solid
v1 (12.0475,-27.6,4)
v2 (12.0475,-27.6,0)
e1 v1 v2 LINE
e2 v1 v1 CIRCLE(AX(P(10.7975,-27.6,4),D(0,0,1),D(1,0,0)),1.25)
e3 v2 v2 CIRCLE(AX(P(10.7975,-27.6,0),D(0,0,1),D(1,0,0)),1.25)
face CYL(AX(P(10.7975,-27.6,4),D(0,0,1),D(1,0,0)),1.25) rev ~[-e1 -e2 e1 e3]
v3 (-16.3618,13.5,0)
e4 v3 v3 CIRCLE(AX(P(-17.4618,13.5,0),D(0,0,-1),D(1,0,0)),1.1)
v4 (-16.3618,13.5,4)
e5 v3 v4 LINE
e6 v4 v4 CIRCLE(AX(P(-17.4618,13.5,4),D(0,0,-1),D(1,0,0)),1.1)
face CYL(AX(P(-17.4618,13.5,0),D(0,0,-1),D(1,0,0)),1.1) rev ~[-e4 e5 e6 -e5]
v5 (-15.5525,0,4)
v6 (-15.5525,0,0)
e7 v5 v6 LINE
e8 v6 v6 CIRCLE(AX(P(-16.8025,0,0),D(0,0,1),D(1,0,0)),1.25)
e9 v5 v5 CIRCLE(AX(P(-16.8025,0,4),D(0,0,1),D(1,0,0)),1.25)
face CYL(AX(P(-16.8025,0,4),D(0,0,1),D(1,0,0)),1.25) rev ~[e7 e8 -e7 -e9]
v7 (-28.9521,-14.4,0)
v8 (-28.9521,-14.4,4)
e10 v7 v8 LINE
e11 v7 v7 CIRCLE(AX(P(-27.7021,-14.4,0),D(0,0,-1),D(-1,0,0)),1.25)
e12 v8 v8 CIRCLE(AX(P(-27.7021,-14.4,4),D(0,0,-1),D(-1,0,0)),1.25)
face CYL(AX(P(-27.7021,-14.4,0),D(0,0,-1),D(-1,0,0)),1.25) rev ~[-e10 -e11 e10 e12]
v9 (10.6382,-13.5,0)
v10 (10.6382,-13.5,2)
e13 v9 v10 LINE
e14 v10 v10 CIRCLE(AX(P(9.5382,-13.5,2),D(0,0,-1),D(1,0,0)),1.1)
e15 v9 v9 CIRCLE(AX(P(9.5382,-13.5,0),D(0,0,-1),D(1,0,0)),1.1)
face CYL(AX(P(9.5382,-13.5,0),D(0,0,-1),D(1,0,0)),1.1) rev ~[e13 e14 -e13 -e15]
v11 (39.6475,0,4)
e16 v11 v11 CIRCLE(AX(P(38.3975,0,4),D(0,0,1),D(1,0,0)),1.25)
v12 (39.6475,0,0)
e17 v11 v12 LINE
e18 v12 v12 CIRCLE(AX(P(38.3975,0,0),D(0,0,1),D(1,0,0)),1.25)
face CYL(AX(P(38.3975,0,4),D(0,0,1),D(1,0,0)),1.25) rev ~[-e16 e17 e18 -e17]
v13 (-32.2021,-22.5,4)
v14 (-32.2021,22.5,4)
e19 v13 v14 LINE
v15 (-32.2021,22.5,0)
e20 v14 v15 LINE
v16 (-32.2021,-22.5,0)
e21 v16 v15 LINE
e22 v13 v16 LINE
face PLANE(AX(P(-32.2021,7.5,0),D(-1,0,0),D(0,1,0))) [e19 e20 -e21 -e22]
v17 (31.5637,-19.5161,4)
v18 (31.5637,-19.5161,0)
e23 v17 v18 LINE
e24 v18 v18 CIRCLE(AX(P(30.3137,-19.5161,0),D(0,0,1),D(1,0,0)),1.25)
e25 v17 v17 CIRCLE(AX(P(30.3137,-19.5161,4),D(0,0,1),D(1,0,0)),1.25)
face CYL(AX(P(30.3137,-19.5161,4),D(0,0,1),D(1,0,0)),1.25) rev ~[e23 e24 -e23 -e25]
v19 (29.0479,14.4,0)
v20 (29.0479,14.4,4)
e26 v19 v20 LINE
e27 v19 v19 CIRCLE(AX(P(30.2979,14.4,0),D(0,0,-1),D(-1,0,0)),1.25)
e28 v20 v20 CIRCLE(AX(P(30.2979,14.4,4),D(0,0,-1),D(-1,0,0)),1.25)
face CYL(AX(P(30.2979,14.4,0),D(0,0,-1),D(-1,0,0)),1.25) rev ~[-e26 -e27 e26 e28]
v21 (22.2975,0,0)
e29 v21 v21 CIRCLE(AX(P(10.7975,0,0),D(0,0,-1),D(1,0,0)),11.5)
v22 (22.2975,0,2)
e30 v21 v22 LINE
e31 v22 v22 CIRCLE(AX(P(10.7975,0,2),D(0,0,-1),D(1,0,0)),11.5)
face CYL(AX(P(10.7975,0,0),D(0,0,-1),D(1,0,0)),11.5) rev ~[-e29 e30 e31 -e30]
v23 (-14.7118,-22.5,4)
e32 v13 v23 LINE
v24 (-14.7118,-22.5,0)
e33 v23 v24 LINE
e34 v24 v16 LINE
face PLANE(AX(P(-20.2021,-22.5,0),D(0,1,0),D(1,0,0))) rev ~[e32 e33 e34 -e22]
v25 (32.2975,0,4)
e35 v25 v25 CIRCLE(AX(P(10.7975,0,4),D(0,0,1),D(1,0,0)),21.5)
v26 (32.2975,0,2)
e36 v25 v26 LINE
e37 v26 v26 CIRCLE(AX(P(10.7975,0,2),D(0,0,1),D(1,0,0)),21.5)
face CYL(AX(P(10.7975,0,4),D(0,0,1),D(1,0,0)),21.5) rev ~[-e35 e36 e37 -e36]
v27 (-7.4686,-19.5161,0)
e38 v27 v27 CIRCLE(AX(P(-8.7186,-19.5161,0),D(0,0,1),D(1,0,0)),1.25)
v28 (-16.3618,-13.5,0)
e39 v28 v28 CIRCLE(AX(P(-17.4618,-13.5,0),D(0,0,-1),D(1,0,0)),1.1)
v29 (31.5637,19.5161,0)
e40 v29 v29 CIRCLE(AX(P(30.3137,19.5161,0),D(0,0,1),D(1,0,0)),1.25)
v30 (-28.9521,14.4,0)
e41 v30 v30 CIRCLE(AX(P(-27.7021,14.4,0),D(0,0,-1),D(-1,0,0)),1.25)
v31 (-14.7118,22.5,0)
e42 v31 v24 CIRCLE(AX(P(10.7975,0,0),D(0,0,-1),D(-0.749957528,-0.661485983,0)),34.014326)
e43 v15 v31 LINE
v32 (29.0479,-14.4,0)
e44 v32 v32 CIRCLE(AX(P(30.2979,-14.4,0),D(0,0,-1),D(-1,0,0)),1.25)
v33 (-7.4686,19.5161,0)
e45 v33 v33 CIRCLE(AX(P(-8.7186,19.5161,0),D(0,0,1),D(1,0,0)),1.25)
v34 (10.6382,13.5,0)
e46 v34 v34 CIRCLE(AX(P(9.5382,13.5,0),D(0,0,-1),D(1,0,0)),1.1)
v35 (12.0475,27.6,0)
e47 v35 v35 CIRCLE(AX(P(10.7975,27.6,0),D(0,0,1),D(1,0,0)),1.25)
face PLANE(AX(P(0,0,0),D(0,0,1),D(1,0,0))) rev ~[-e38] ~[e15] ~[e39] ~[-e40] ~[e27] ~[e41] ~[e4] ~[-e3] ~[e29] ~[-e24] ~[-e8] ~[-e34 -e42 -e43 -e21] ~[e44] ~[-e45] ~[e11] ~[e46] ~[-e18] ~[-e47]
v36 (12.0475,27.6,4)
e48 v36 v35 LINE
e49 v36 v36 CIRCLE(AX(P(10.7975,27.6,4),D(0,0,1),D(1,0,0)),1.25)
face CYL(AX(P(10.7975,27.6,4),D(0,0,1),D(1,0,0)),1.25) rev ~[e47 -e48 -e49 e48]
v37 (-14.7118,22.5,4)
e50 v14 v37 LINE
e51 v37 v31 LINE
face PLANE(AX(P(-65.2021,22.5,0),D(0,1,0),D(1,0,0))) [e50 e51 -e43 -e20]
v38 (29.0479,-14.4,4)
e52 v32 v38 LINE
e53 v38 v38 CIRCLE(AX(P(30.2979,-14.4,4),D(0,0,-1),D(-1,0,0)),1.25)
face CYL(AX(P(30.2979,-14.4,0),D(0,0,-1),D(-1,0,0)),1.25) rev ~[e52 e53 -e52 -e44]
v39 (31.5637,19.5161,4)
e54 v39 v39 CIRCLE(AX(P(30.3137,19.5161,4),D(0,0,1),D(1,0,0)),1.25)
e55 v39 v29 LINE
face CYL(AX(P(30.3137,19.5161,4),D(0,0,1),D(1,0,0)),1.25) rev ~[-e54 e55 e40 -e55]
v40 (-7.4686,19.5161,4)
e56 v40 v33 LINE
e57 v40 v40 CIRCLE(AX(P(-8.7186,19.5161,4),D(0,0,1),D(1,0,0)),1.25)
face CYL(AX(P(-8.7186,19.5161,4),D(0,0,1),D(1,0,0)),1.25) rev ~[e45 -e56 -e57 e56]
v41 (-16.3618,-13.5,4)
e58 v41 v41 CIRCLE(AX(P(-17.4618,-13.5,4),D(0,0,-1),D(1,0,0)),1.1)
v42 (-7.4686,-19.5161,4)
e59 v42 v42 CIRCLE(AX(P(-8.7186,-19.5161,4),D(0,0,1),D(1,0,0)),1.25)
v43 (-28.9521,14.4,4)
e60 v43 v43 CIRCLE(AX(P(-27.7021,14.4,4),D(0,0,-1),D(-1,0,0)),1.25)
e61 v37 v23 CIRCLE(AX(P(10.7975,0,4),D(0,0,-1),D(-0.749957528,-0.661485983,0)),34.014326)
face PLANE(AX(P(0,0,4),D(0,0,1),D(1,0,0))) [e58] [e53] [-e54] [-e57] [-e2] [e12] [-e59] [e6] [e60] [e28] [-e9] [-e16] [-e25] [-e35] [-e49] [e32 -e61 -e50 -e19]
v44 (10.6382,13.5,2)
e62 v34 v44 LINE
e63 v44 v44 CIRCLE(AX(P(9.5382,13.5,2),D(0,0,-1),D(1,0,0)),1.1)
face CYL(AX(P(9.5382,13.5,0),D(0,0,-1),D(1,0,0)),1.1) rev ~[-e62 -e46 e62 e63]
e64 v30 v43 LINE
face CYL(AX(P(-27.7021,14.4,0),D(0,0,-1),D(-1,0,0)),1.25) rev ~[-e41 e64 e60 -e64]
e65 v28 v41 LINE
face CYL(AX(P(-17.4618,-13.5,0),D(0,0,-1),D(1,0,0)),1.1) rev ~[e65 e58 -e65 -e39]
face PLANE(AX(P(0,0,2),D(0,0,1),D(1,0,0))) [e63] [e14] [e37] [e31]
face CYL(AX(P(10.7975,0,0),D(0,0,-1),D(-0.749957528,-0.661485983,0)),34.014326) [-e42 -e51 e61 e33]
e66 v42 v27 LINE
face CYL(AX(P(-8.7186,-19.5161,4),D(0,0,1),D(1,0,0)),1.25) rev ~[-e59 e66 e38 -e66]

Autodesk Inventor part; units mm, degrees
ref_plane "YZ Plane" through (0, 0, 0) normal (1, 0, 0) x (0, 1, 0)
ref_plane "XZ Plane" through (0, 0, 0) normal (0, 1, 0) x (-1, 0, 0)
ref_plane "XY Plane" through (0, 0, 0) normal (0, 0, 1) x (1, 0, 0)
sketch "スケッチ1" plane through (0, 0, 0) normal (0, 0, 1) x (1, 0, 0)
  line L0 (22.7979, -11.619) -> (22.7979, 11.619) construction
  arc A0 (22.7979, 11.619) -> (11.7979, 16) centre (11.7979, 0) ccw construction
  line L1 (11.7979, 16) -> (-18.2021, 16) construction
  arc A1 (-18.2021, 16) -> (-20.2021, 14) centre (-18.2021, 14) ccw construction
  line L2 (-20.2021, 14) -> (-20.2021, -14) construction
  arc A2 (-20.2021, -14) -> (-18.2021, -16) centre (-18.2021, -14) ccw construction
  line L3 (-18.2021, -16) -> (11.7979, -16) construction
  arc A3 (11.7979, -16) -> (22.7979, -11.619) centre (11.7979, 0) ccw construction
  circle A4 centre (-17.4618, -13.5) radius 1.05 construction
  circle A5 centre (-17.4618, 13.5) radius 1.05 construction
  circle A6 centre (9.5382, -13.5) radius 1.05 construction
  circle A7 centre (9.5382, 13.5) radius 1.05 construction
  circle A8 centre (10.7975, 0) radius 2.7 projected
  circle A9 centre (-57.7021, 15) radius 1.6 construction
  circle A10 centre (-27.7021, 15) radius 1.6 construction
  line L4 (-65.2021, 7.5) -> (-65.2021, 22.5) projected
  line L5 (-65.2021, 7.5) -> (-20.2021, 7.5) construction
  line L6 (-20.2021, 22.5) -> (-20.2021, 7.5) construction
  line L7 (-65.2021, 22.5) -> (-20.2021, 22.5) projected
  circle A11 centre (-57.7021, -15) radius 1.6 construction
  circle A12 centre (-27.7021, -15) radius 1.6 construction
  line L8 (-65.2021, -22.5) -> (-65.2021, -7.5) projected
  line L9 (-65.2021, -22.5) -> (-20.2021, -22.5) projected
  line L10 (-20.2021, -7.5) -> (-20.2021, -22.5) construction
  line L11 (-65.2021, -7.5) -> (-20.2021, -7.5) construction
  circle A13 centre (-57.7021, -15) radius 1.6 construction
  circle A14 centre (-57.7021, 15) radius 1.6 construction
  line L12 (-50.2021, -22.5) -> (-65.2021, -22.5) projected
  line L13 (-50.2021, -22.5) -> (-50.2021, 22.5) construction
  line L14 (-65.2021, 22.5) -> (-50.2021, 22.5) projected
  line L15 (-65.2021, -22.5) -> (-65.2021, 22.5) projected
  circle A15 centre (10.7975, 0) radius 27.5 construction
  line L16 (-65.2021, 22.5) -> (-14.7118, 22.5)
  line L17 (-65.2021, 22.5) -> (-65.2021, -22.5)
  line L18 (-65.2021, -22.5) -> (-14.7118, -22.5)
  arc A16 (-14.7118, -22.5) -> (-14.7118, 22.5) centre (10.7975, 0) ccw
  circle A17 centre (10.7975, 0) radius 11.5
  circle A18 centre (9.5382, 13.5) radius 1.1
  circle A19 centre (9.5382, -13.5) radius 1.1
  circle A20 centre (-17.4618, 13.5) radius 1.1
  circle A21 centre (-17.4618, -13.5) radius 1.1
  circle A22 centre (-27.7021, 15) radius 1.25
  circle A23 centre (-57.7021, 15) radius 1.25
  circle A24 centre (-57.7021, -15) radius 1.25
  circle A25 centre (-27.7021, -15) radius 1.25
  point P0 (0, 0)
  dimension "d0" = 55
  dimension "d1" = 23
  dimension "d2" = 2.2
  dimension "d3" = 2.2
  dimension "d4" = 2.2
  dimension "d5" = 2.2
  dimension "d6" = 2.5
  dimension "d7" = 2.5
  dimension "d8" = 2.5
  dimension "d9" = 2.5
extrude "押し出し1" add sketch "スケッチ1" along normal blind 4 contours L4 L7 L16 A16 L18 L9 L8 L15
sketch "スケッチ2" plane through (0, 0, 4) normal (0, 0, 1) x (1, 0, 0)
  circle A0 centre (10.7975, 0) radius 11.5 projected
  circle A1 centre (-27.7021, -15) radius 1.25 projected
  circle A2 centre (-57.7021, -15) radius 1.25 projected
  circle A3 centre (-57.7021, 15) radius 1.25 projected
  circle A4 centre (-27.7021, 15) radius 1.25 projected
  circle A5 centre (-17.4618, -13.5) radius 1.1 projected
  circle A6 centre (-17.4618, 13.5) radius 1.1 projected
  circle A7 centre (9.5382, -13.5) radius 1.1 projected
  circle A8 centre (9.5382, 13.5) radius 1.1 projected
  line L0 (-65.2021, 22.5) -> (-65.2021, -22.5) projected
  line L1 (-65.2021, -22.5) -> (-14.7118, -22.5) projected
  arc A9 (-14.7118, -22.5) -> (-14.7118, 22.5) centre (10.7975, 0) ccw projected
  line L2 (-14.7118, 22.5) -> (-65.2021, 22.5) projected
  circle A10 centre (10.7975, 0) radius 21.5
  point P0 (0, 0)
  dimension "d12" = 43
extrude "押し出し4" cut sketch "スケッチ2" against normal blind 2 contours A10
sketch "スケッチ4" plane through (0, 0, 4) normal (0, 0, 1) x (1, 0, 0)
  circle A0 centre (10.7975, 0) radius 21.5 projected
  circle A1 centre (-27.7021, -15) radius 1.25 projected
  circle A2 centre (-57.7021, -15) radius 1.25 projected
  circle A3 centre (-57.7021, 15) radius 1.25 projected
  circle A4 centre (-27.7021, 15) radius 1.25 projected
  circle A5 centre (-17.4618, -13.5) radius 1.1 projected
  circle A6 centre (-17.4618, 13.5) radius 1.1 projected
  line L0 (-65.2021, 22.5) -> (-65.2021, -22.5) projected
  line L1 (-65.2021, -22.5) -> (-14.7118, -22.5) projected
  arc A7 (-14.7118, -22.5) -> (-14.7118, 22.5) centre (10.7975, 0) ccw projected
  line L2 (-14.7118, 22.5) -> (-65.2021, 22.5) projected
  circle A8 centre (10.7975, 0) radius 27.6
  circle A9 centre (38.3975, 0) radius 1.25
  circle A10 centre (30.3137, 19.5161) radius 1.25
  circle A11 centre (10.7975, 27.6) radius 1.25
  circle A12 centre (-8.7186, 19.5161) radius 1.25
  circle A13 centre (-16.8025, 0) radius 1.25
  circle A14 centre (-8.7186, -19.5161) radius 1.25
  circle A15 centre (10.7975, -27.6) radius 1.25
  circle A16 centre (30.3137, -19.5161) radius 1.25
  point P0 (0, 0)
  dimension "d25" = 55.2
  dimension "d26" = 2.5
  dimension "d29" = 360
extrude "押し出し5" cut sketch "スケッチ4" against normal through all contours A8 A9 | A8 A9 | A10 A8 | A8 A10 | A16 A8 | A8 A16 | A11 A8 | A8 A11 | A15 A8 | A8 A15 | A12 A8 | A8 A12 | A14 A8 | A8 A14 | A13 A8 | A8 A13
move faces "移動1" translate (33, 0, 0) faces at (-65.2021, 7.5, 1.3333)
sketch "スケッチ8" plane through (0, 0, 0) normal (0, 0, -1) x (-1, 0, 0)
  circle A0 centre (27.7021, -15) radius 1.25 projected
  circle A1 centre (27.7021, 15) radius 1.25 projected
  point P0 (0, 0)
extrude "押し出し7" add sketch "スケッチ8" against normal blind 4
sketch "スケッチ7" plane through (0, 0, 0) normal (0, 0, -1) x (-1, 0, 0)
  circle A0 centre (-30.2979, -14.4) radius 1.6 projected
  circle A1 centre (-30.2979, 14.4) radius 1.6 projected
  circle A2 centre (27.7021, -14.4) radius 1.6 projected
  circle A3 centre (27.7021, 14.4) radius 1.6 projected
  circle A4 centre (-30.2979, -14.4) radius 1.25
  circle A5 centre (-30.2979, 14.4) radius 1.25
  circle A6 centre (27.7021, -14.4) radius 1.25
  circle A7 centre (27.7021, 14.4) radius 1.25
  point P0 (0, 0)
  dimension "d45" = 2.5
  dimension "d46" = 2.5
  dimension "d47" = 2.5
  dimension "d48" = 2.5
extrude "押し出し8" cut sketch "スケッチ7" against normal through all contours A4 | A5 | A6 | A7
properties part number "先端モータマウントC" material "アルミニウム 6061"
